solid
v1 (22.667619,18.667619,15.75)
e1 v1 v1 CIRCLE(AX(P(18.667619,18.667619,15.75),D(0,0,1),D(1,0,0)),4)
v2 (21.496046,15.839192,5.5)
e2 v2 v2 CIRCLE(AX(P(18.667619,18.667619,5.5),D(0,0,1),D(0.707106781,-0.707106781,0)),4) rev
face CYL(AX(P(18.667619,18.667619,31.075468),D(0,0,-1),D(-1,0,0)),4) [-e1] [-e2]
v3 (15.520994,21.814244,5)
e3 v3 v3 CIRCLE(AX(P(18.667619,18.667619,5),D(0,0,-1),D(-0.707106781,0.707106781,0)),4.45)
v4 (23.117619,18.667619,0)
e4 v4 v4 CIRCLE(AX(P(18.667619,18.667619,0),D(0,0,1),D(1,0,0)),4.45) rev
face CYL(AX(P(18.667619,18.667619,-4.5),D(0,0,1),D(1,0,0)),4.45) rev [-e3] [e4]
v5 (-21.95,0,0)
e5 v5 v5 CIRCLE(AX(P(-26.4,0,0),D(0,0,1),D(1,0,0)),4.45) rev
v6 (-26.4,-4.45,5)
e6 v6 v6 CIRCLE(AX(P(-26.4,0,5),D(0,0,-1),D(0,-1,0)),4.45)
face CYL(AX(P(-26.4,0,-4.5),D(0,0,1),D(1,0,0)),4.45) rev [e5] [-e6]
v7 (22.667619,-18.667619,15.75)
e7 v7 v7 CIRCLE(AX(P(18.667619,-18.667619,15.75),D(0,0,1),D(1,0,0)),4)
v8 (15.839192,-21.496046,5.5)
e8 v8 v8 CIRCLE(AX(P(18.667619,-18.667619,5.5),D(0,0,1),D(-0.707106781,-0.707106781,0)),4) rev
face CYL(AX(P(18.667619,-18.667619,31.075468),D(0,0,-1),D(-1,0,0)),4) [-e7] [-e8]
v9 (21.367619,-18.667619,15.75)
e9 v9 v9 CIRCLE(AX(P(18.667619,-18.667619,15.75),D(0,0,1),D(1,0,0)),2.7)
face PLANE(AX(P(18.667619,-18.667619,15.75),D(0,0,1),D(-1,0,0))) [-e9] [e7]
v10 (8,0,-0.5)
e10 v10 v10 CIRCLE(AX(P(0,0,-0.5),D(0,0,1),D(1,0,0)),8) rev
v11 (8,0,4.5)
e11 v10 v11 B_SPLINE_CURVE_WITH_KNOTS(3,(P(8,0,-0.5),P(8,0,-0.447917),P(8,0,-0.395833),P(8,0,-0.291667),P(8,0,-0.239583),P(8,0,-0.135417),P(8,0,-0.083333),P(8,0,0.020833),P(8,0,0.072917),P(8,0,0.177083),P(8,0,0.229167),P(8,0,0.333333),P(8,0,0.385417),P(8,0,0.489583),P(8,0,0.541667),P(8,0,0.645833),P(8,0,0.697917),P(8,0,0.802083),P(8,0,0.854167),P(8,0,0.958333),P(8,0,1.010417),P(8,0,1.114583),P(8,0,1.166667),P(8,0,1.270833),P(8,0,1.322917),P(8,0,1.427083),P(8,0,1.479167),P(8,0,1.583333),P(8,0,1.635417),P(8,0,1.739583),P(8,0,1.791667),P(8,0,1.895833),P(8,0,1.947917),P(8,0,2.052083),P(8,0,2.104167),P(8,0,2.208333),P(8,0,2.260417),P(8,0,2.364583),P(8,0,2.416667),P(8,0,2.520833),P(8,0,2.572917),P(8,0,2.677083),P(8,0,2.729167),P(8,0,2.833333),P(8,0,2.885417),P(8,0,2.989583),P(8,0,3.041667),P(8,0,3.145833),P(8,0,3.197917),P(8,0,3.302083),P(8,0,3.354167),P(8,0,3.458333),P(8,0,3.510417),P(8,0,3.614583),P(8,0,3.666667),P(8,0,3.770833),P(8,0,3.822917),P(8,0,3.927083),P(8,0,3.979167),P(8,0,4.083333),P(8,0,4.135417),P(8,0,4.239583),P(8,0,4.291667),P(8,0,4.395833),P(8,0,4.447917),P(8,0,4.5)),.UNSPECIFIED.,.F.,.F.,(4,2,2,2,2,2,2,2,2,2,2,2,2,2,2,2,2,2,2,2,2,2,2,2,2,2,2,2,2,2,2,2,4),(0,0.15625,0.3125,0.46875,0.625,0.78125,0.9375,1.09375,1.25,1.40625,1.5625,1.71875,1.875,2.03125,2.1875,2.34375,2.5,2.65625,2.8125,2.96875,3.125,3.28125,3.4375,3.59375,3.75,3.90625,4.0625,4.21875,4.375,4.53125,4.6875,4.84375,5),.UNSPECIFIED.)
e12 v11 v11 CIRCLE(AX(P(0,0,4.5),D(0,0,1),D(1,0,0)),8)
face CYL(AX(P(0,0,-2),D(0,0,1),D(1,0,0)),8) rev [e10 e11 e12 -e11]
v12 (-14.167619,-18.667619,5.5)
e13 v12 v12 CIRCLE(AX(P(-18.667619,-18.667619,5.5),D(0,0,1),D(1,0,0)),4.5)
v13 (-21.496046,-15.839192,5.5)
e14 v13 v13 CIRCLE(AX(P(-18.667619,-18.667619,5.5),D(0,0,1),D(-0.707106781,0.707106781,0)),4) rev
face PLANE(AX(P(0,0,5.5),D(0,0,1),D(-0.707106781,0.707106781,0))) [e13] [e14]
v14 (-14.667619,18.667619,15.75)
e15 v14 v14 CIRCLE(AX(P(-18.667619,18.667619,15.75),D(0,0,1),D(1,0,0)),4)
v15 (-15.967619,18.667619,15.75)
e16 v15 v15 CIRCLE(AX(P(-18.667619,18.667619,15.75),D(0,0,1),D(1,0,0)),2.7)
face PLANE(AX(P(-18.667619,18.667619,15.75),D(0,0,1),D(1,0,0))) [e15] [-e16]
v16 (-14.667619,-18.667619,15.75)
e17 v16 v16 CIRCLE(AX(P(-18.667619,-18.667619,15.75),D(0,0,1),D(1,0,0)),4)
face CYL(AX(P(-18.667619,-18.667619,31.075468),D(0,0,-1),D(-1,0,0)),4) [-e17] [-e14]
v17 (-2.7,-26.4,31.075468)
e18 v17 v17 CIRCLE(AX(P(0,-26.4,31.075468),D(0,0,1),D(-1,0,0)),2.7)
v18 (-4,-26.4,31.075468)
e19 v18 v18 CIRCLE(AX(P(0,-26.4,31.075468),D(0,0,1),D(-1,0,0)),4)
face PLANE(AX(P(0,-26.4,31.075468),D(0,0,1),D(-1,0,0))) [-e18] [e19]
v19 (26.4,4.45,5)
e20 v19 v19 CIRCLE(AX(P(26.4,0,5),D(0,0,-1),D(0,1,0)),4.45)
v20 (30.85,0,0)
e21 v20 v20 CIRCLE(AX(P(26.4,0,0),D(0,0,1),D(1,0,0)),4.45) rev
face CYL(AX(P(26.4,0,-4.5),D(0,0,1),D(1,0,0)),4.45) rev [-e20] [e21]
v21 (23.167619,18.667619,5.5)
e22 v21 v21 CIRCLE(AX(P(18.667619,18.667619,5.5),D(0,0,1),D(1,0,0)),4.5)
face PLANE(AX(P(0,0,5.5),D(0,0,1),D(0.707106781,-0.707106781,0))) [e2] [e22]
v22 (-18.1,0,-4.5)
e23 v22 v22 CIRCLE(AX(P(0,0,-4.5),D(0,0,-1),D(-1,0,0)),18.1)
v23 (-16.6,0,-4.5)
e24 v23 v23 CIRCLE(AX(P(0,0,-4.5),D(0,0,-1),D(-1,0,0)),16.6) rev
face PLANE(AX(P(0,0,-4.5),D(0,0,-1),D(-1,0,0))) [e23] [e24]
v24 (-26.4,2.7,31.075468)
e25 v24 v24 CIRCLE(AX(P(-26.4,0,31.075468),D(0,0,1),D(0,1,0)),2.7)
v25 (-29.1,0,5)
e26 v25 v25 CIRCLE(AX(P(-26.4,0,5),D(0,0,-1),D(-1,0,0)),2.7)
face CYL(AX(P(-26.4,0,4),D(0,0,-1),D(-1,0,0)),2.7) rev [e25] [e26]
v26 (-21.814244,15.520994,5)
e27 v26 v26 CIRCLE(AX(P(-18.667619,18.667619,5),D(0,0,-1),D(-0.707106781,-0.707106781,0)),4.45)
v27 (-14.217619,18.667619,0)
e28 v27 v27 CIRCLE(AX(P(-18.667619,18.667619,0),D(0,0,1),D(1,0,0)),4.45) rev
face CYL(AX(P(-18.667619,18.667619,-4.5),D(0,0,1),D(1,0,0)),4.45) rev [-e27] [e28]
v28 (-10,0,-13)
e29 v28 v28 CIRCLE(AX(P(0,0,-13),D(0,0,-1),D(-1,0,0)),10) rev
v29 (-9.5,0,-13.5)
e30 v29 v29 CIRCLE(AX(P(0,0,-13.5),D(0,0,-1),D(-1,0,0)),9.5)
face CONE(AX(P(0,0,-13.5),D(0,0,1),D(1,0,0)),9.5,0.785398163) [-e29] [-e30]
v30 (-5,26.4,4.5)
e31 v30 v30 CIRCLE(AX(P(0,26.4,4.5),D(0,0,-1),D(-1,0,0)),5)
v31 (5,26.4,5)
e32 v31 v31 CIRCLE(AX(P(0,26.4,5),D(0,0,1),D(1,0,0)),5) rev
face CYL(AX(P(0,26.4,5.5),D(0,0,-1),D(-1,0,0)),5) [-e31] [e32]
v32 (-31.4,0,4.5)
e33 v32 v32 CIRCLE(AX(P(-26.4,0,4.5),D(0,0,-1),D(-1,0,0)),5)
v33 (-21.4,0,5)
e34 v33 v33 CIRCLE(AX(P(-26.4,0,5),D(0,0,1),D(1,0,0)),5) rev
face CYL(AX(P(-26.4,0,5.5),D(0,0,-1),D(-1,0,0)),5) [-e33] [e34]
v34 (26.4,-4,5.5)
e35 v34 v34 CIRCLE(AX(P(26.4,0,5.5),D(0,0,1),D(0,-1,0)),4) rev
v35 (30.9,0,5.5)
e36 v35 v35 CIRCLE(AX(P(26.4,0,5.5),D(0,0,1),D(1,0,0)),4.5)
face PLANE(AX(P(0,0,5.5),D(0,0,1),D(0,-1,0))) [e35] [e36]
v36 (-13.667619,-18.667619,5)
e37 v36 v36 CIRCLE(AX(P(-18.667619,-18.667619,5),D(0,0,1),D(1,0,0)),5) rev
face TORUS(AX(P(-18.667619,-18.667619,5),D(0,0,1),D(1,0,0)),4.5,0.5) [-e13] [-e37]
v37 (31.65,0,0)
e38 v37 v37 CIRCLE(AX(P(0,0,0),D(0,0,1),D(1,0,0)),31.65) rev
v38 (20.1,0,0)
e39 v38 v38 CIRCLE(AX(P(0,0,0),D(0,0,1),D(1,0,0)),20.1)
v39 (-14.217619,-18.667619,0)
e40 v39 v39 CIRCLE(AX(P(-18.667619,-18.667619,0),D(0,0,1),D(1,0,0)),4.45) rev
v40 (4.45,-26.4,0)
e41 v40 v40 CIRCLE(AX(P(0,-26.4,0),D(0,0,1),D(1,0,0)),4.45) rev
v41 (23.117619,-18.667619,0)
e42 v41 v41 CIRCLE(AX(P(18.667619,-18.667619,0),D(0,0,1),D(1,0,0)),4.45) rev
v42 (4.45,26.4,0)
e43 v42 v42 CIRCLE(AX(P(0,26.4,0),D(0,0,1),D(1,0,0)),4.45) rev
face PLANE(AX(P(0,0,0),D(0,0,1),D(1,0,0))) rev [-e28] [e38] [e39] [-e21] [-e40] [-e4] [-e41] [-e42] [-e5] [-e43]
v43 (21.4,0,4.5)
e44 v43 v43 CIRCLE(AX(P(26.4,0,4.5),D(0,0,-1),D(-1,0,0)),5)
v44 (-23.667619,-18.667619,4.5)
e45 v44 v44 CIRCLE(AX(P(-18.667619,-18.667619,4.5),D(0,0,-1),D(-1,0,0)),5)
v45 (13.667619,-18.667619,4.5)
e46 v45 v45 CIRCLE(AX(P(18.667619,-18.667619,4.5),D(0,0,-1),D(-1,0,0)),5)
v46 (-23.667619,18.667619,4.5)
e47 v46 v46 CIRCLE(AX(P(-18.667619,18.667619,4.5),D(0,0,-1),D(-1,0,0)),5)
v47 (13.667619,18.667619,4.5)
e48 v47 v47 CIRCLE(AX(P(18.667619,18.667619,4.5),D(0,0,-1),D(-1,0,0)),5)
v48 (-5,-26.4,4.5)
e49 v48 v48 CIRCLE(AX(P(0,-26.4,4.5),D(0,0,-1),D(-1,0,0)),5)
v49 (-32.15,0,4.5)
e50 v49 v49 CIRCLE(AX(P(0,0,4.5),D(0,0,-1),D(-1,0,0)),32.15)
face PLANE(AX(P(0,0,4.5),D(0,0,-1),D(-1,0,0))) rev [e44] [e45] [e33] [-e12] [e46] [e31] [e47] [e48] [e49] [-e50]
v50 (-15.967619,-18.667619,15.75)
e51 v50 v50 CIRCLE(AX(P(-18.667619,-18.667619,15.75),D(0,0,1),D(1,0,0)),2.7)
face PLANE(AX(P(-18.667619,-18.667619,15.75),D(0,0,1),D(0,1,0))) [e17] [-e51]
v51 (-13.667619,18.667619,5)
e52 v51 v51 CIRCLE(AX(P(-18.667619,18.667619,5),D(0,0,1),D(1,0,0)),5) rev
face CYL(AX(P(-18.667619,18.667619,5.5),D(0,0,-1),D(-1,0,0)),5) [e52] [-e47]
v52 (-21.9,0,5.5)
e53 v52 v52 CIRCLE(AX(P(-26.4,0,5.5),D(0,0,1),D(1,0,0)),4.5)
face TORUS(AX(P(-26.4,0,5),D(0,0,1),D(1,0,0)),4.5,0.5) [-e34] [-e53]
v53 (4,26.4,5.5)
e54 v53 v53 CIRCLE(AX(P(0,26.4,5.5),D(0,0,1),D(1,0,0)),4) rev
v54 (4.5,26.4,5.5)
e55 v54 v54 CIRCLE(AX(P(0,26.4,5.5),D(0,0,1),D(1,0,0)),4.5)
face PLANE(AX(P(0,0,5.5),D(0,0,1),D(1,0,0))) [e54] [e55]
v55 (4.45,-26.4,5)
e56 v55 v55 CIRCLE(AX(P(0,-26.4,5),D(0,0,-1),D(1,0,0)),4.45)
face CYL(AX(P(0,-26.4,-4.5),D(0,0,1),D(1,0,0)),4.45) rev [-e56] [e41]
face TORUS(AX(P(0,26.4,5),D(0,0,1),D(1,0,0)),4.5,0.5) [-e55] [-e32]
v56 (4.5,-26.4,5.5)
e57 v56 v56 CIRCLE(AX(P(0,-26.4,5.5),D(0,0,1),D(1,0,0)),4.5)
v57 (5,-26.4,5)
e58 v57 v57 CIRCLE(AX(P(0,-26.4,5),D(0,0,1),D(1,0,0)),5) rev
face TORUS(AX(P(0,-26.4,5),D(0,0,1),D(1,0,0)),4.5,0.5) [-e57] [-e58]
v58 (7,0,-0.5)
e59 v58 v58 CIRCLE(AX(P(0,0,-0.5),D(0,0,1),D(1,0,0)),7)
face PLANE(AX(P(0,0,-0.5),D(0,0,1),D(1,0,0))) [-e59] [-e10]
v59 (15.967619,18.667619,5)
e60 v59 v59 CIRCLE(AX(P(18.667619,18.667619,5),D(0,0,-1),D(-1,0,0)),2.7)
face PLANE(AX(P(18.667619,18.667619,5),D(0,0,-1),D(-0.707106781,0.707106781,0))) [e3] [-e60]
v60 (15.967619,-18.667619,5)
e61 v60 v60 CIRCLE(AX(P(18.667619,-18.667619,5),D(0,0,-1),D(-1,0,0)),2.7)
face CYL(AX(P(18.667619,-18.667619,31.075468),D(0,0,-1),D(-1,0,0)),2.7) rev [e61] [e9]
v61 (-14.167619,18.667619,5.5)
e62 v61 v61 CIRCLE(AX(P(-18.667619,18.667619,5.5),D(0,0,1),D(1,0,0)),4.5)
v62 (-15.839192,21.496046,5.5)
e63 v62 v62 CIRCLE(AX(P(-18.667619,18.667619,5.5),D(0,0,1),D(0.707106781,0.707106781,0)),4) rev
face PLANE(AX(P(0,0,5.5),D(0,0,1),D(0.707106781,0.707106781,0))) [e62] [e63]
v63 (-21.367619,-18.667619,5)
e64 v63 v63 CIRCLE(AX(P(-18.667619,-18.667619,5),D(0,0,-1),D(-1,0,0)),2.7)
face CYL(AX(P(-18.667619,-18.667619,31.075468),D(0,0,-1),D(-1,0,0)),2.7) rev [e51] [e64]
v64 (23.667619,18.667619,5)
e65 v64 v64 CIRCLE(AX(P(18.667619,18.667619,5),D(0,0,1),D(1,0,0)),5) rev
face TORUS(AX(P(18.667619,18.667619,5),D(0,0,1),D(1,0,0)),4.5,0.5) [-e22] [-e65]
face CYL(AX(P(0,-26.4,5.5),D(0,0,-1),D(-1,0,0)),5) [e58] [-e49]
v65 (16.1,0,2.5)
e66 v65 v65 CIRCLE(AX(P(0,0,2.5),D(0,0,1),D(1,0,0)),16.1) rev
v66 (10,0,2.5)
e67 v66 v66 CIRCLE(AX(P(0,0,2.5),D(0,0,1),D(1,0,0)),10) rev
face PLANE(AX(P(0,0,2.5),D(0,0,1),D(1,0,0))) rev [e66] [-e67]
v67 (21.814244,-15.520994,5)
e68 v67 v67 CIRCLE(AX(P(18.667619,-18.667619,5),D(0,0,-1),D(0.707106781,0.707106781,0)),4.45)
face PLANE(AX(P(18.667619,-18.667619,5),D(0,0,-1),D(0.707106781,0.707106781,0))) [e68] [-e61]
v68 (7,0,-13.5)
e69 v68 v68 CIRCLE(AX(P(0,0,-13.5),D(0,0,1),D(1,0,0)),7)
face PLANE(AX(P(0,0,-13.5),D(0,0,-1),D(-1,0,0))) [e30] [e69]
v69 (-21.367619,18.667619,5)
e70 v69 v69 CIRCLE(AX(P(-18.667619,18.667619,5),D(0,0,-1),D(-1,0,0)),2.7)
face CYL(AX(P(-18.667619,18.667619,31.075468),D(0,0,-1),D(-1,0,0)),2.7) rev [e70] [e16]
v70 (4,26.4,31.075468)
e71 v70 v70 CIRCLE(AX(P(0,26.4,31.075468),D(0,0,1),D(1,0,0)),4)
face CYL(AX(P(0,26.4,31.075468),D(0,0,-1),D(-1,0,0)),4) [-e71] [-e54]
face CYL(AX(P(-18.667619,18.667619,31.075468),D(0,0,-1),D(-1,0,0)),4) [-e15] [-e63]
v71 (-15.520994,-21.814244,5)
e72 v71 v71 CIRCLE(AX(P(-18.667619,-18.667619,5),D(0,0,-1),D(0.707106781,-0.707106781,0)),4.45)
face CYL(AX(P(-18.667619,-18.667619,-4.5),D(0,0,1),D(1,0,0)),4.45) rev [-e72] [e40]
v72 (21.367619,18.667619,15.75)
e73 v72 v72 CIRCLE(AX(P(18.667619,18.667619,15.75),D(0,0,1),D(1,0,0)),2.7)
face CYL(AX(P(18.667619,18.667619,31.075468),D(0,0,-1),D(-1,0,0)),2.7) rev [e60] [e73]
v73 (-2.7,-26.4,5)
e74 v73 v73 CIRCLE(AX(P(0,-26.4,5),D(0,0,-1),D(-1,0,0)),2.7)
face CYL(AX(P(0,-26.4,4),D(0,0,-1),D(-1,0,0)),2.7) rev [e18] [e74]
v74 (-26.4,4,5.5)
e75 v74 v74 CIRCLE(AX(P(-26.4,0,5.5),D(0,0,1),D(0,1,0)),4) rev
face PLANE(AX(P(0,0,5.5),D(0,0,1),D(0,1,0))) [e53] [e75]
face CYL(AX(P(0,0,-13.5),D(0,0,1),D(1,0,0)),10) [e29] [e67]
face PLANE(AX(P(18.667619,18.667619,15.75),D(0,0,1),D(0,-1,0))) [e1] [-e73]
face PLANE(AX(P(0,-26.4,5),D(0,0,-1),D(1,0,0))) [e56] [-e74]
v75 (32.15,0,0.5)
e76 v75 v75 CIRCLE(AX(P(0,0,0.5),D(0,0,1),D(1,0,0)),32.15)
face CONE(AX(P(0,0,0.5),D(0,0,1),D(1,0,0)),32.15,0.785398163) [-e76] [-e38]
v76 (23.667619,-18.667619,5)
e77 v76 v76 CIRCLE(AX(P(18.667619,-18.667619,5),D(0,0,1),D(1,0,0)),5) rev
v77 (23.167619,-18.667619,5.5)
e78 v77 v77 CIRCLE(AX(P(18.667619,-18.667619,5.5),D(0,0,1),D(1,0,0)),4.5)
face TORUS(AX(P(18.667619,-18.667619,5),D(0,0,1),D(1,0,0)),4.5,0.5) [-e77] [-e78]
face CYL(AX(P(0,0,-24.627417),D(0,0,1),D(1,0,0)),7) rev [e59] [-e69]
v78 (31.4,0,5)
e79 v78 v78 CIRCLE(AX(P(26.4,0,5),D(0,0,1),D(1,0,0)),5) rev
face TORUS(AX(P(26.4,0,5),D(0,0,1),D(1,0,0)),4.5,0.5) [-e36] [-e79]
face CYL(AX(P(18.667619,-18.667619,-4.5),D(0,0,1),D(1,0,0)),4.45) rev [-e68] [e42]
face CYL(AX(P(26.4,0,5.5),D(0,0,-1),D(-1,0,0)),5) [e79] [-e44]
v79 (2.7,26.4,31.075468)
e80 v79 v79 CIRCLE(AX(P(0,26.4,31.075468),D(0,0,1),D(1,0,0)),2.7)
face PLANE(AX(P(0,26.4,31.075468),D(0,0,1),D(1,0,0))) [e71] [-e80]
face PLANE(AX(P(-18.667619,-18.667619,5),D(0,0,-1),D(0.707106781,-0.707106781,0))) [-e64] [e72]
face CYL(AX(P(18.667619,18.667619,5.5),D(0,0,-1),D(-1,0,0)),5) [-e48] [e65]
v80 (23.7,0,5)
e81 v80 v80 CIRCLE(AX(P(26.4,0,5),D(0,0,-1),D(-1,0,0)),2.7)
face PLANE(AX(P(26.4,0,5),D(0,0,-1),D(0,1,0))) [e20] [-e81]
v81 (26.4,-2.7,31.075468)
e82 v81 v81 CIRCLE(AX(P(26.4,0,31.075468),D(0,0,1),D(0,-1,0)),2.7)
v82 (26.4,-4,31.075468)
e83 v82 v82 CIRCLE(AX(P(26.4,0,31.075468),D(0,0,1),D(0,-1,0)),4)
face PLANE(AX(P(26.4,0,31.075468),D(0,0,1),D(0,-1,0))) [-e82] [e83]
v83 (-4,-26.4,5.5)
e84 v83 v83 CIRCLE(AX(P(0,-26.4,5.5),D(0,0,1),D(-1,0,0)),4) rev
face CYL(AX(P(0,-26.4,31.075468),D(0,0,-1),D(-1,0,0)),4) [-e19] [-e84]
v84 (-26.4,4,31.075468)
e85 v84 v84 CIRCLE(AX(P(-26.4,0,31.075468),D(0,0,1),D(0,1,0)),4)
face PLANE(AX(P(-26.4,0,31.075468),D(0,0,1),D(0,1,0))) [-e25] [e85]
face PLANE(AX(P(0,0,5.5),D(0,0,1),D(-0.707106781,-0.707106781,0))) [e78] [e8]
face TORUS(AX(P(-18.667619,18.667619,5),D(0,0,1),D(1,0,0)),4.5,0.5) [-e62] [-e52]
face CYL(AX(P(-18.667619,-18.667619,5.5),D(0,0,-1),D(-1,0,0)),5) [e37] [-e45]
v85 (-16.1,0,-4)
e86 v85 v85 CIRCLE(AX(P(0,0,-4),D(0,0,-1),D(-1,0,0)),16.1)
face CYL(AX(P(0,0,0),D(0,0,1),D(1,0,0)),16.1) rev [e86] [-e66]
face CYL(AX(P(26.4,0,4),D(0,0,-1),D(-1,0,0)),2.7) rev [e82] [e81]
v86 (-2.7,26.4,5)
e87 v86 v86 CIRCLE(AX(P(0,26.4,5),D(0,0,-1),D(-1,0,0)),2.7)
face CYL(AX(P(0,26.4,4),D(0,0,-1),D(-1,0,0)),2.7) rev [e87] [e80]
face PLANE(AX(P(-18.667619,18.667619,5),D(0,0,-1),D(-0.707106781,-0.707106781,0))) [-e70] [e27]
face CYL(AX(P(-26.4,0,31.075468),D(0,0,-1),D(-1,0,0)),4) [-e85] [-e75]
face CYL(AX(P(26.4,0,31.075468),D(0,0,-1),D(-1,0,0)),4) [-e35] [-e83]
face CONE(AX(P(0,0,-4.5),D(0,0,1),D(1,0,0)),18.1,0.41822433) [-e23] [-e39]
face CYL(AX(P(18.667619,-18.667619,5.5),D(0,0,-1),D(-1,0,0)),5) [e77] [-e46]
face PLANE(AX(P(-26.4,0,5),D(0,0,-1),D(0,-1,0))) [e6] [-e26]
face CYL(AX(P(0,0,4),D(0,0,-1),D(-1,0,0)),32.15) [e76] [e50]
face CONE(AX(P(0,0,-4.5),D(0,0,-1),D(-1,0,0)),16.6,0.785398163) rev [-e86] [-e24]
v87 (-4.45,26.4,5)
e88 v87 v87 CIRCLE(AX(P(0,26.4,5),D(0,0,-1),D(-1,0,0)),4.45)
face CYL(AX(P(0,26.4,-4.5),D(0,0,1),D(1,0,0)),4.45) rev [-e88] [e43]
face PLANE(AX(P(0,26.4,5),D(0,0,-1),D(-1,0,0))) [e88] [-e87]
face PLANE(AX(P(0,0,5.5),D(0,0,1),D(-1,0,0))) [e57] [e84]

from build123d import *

# Parameters (mm, degrees)
SKETCH1_R                = 32.15
SKETCH1_R_2              = 2.7
BOSS_EXTRUDE1_DEPTH      = 4
SKETCH2_R                = 4
SKETCH2_R_2              = 2.7
BOSS_EXTRUDE2_DEPTH      = 27.07546845
SKETCH3_R                = 5
SKETCH3_R_2              = 4
BOSS_EXTRUDE3_DEPTH      = 1.5
FILLET2_R                = 0.5
CIRPATTERN1_COUNT        = 8
FILLET2_OF_CIRPATTERN1_R = 0.5
CHAMFER1_SIZE            = 0.5
SKETCH9_R                = 8
CUT_EXTRUDE4_DEPTH       = 53.918106464
BOSS_EXTRUDE7_START      = -6.5
SKETCH10_R               = 8
SKETCH10_R_2             = 6.5
BOSS_EXTRUDE7_DEPTH      = 6.5
CUT_EXTRUDE5_DEPTH       = 53.918106464
CUT_EXTRUDE5_DEPTH_BACK  = 53.918106464
SKETCH14_R               = 16.1
SKETCH15_R               = 16.1
SKETCH15_R_2             = 15.1
BOSS_EXTRUDE8_DEPTH      = 1.5
SKETCH16_R               = 18.1
SKETCH16_R_2             = 16.1
BOSS_EXTRUDE9_DEPTH      = 4.5
CHAMFER3_SIZE2           = 4.5
CHAMFER3_SIZE            = 2
CUT_EXTRUDE3_START       = -5
SKETCH7_R                = 4.45
CUT_EXTRUDE3_DEPTH       = 61.072041358
CIRPATTERN2_COUNT        = 8
CHAMFER4_SIZE            = 0.5
SKETCH17_R               = 6.596186261
CUT_EXTRUDE6_DEPTH       = 15.32546845
CIRPATTERN3_COUNT        = 4
BOSS_EXTRUDE11_START     = -2
SKETCH19_R               = 15.1
BOSS_EXTRUDE11_DEPTH     = 2
SKETCH18_R               = 10
SKETCH18_R_2             = 8
BOSS_EXTRUDE10_DEPTH     = 16
SKETCH20_R               = 8
CUT_EXTRUDE7_DEPTH       = 6.5
BOSS_EXTRUDE12_START     = -5
SKETCH23_R               = 8
SKETCH23_R_2             = 7
BOSS_EXTRUDE12_DEPTH     = 1.5
CHAMFER6_SIZE            = 0.5
CUT_EXTRUDE8_DEPTH       = 57.224830931
CUT_EXTRUDE8_DEPTH_BACK  = 57.224830931
SKETCH24_R               = 7
SKETCH25_R               = 32.15
SKETCH25_R_2             = 5
SKETCH25_R_3             = 15.1
BOSS_EXTRUDE13_DEPTH     = 0.5


with BuildPart() as part:
    # Sketch1 → Boss-Extrude1 (new body)
    with BuildSketch(Plane.XY):
        Circle(SKETCH1_R)
        with Locations((0, 26.4)):
            Circle(SKETCH1_R_2, mode=Mode.SUBTRACT)
        with Locations((26.4, 0)):
            Circle(SKETCH1_R_2, mode=Mode.SUBTRACT)
        with Locations((0, -26.4)):
            Circle(SKETCH1_R_2, mode=Mode.SUBTRACT)
        with Locations((-26.4, 0)):
            Circle(SKETCH1_R_2, mode=Mode.SUBTRACT)
    extrude(amount=BOSS_EXTRUDE1_DEPTH)

    # Sketch2 → Boss-Extrude2 (add)
    with BuildSketch(Plane.XY.offset(4)):
        with Locations((0, 26.4)):
            Circle(SKETCH2_R)
        with Locations((0, 26.4)):
            Circle(SKETCH2_R_2, mode=Mode.SUBTRACT)
    boss_extrude2 = extrude(amount=BOSS_EXTRUDE2_DEPTH)

    # Sketch3 → Boss-Extrude3 (add)
    with BuildSketch(Plane.XY.offset(4)):
        with Locations((0, 26.4)):
            Circle(SKETCH3_R)
        with Locations((0, 26.4)):
            Circle(SKETCH3_R_2, mode=Mode.SUBTRACT)
    boss_extrude3 = extrude(amount=BOSS_EXTRUDE3_DEPTH)

    # Fillet2
    fillet2_edges = [part.edges().sort_by_distance(p)[0] for p in [
        (-5, 26.4, 5.5),
    ]]
    fillet(fillet2_edges, radius=FILLET2_R)

    # CirPattern1: Boss-Extrude2, Boss-Extrude3 ×8 about axis
    cirpattern1_axis = Axis((0, 0, 0), (0, 0, 1))
    add([boss_extrude2.rotate(cirpattern1_axis, i * 360 / CIRPATTERN1_COUNT) for i in range(1, CIRPATTERN1_COUNT)])
    add([boss_extrude3.rotate(cirpattern1_axis, i * 360 / CIRPATTERN1_COUNT) for i in range(1, CIRPATTERN1_COUNT)])

    # Fillet2 of CirPattern1
    fillet2_of_cirpattern1_edges = [part.edges().sort_by_distance(p)[0] for p in [
        (-22.203152929, 15.132085117, 5.5),
        (-26.4, -5, 5.5),
        (-15.132085117, -22.203152929, 5.5),
        (5, -26.4, 5.5),
        (22.203152929, -15.132085117, 5.5),
        (26.4, 5, 5.5),
        (15.132085117, 22.203152929, 5.5),
    ]]
    fillet(fillet2_of_cirpattern1_edges, radius=FILLET2_OF_CIRPATTERN1_R)

    # Chamfer1
    chamfer1_edges = [part.edges().sort_by_distance(p)[0] for p in [
        (-32.15, 0, 0),
    ]]
    chamfer(chamfer1_edges, length=CHAMFER1_SIZE)

    # Sketch9 → Cut-Extrude4 (cut, through all)
    with BuildSketch(Plane.XY.offset(4)):
        Circle(SKETCH9_R)
    extrude(amount=-CUT_EXTRUDE4_DEPTH, mode=Mode.SUBTRACT)

    # Sketch10 → Boss-Extrude7 (add)
    with BuildSketch(Plane(origin=(0, 0, 0), x_dir=(-1, 0, 0), z_dir=(0, 0, -1)).offset(BOSS_EXTRUDE7_START)):
        Circle(SKETCH10_R)
        Circle(SKETCH10_R_2, mode=Mode.SUBTRACT)
    extrude(amount=BOSS_EXTRUDE7_DEPTH)

    # Sketch14 → Cut-Extrude5 (cut, two sides: drawn at the far end of the back side and taken through both)
    with BuildSketch(Plane.XY.offset(4).offset(-CUT_EXTRUDE5_DEPTH_BACK)):
        Circle(SKETCH14_R)
    extrude(amount=CUT_EXTRUDE5_DEPTH + CUT_EXTRUDE5_DEPTH_BACK, mode=Mode.SUBTRACT)

    # Sketch15 → Boss-Extrude8 (add)
    with BuildSketch(Plane.XY.offset(4)):
        Circle(SKETCH15_R)
        Circle(SKETCH15_R_2, mode=Mode.SUBTRACT)
    extrude(amount=-BOSS_EXTRUDE8_DEPTH)

    # Sketch16 → Boss-Extrude9 (add)
    with BuildSketch(Plane(origin=(0, 0, 0), x_dir=(-1, 0, 0), z_dir=(0, 0, -1))):
        with Locations(Location((0, 0, 0), (0, 0, 180))):
            Circle(SKETCH16_R)
        with Locations(Location((0, 0, 0), (0, 0, 180))):
            Circle(SKETCH16_R_2, mode=Mode.SUBTRACT)
    extrude(amount=BOSS_EXTRUDE9_DEPTH)

    # Chamfer3
    chamfer3_edges = [part.edges().sort_by_distance(p)[0] for p in [
        (-18.1, 0, 0),
    ]]
    chamfer3_side = [part.faces().sort_by_distance(p)[0] for p in [
        (-18.14, 0, 0),
    ]]
    chamfer(chamfer3_edges, length=CHAMFER3_SIZE - 0.0001, length2=CHAMFER3_SIZE2 - 0.0001, reference=chamfer3_side[0])  # a hair under: the kernel refuses the full size

    # Sketch7 → Cut-Extrude3 (cut)
    with BuildSketch(Plane(origin=(0, 0, 0), x_dir=(-1, 0, 0), z_dir=(0, 0, -1)).offset(CUT_EXTRUDE3_START)):
        with Locations(Location((0, 26.4, 0), (0, 0, 180))):
            Circle(SKETCH7_R)
    cut_extrude3 = extrude(amount=CUT_EXTRUDE3_DEPTH, mode=Mode.SUBTRACT)

    # CirPattern2: Cut-Extrude3 ×8 about axis
    cirpattern2_axis = Axis((0, 0, 0), (0, 0, 1))
    for i in range(1, CIRPATTERN2_COUNT):
        add(cut_extrude3.rotate(cirpattern2_axis, i * 360 / CIRPATTERN2_COUNT), mode=Mode.SUBTRACT)

    # Chamfer4
    chamfer4_edges = [part.edges().sort_by_distance(p)[0] for p in [
        (-16.1, 0, -4.5),
    ]]
    chamfer(chamfer4_edges, length=CHAMFER4_SIZE)

    # Sketch17 → Cut-Extrude6 (cut)
    with BuildSketch(Plane.XY.offset(31.07546845)):
        with Locations((-18.667619023, 18.667619023)):
            Circle(SKETCH17_R)
    cut_extrude6 = extrude(amount=-CUT_EXTRUDE6_DEPTH, mode=Mode.SUBTRACT)

    # CirPattern3: Cut-Extrude6 ×4 about axis
    cirpattern3_axis = Axis((0, 0, 4), (0, 0, 1))
    for i in range(1, CIRPATTERN3_COUNT):
        add(cut_extrude6.rotate(cirpattern3_axis, i * 360 / CIRPATTERN3_COUNT), mode=Mode.SUBTRACT)

    # Sketch19 → Boss-Extrude11 (add)
    with BuildSketch(Plane(origin=(0, 0, 2.5), x_dir=(-1, 0, 0), z_dir=(0, 0, -1)).offset(BOSS_EXTRUDE11_START)):
        Circle(SKETCH19_R)
    extrude(amount=BOSS_EXTRUDE11_DEPTH)

    # Sketch18 → Boss-Extrude10 (add)
    # profile 1 of 2: a face of its own
    with BuildSketch(Plane(origin=(0, 0, 2.5), x_dir=(-1, 0, 0), z_dir=(0, 0, -1))):
        with Locations(Location((0, 0, 0), (0, 0, 180))):
            Circle(SKETCH18_R)
        Circle(SKETCH18_R_2, mode=Mode.SUBTRACT)
    # profile 2 of 2: a face of its own
    with BuildSketch(Plane(origin=(0, 0, 2.5), x_dir=(-1, 0, 0), z_dir=(0, 0, -1))):
        Circle(SKETCH18_R_2)
    extrude(amount=BOSS_EXTRUDE10_DEPTH)

    # Sketch20 → Cut-Extrude7 (cut)
    with BuildSketch(Plane.XY.offset(4.5)):
        Circle(SKETCH20_R)
    extrude(amount=-CUT_EXTRUDE7_DEPTH, mode=Mode.SUBTRACT)

    # Sketch23 → Boss-Extrude12 (add)
    with BuildSketch(Plane.XY.offset(4.5).offset(BOSS_EXTRUDE12_START)):
        Circle(SKETCH23_R)
        Circle(SKETCH23_R_2, mode=Mode.SUBTRACT)
    extrude(amount=-BOSS_EXTRUDE12_DEPTH)

    # Chamfer6
    chamfer6_edges = [part.edges().sort_by_distance(p)[0] for p in [
        (-10, 0, -13.5),
    ]]
    chamfer(chamfer6_edges, length=CHAMFER6_SIZE)

    # Sketch24 → Cut-Extrude8 (cut, two sides: drawn at the far end of the back side and taken through both)
    with BuildSketch(Plane.XY.offset(-2).offset(-CUT_EXTRUDE8_DEPTH_BACK)):
        Circle(SKETCH24_R)
    extrude(amount=CUT_EXTRUDE8_DEPTH + CUT_EXTRUDE8_DEPTH_BACK, mode=Mode.SUBTRACT)

    # Sketch25 → Boss-Extrude13 (add)
    with BuildSketch(Plane.XY.offset(4)):
        with Locations(Location((0, 0, 0), (0, 0, 180))):
            Circle(SKETCH25_R)
        with Locations(Location((-18.667619023, -18.667619023, 0), (0, 0, 180))):
            Circle(SKETCH25_R_2, mode=Mode.SUBTRACT)
        with Locations(Location((0, -26.4, 0), (0, 0, 180))):
            Circle(SKETCH25_R_2, mode=Mode.SUBTRACT)
        with Locations(Location((18.667619023, -18.667619023, 0), (0, 0, 180))):
            Circle(SKETCH25_R_2, mode=Mode.SUBTRACT)
        with Locations(Location((26.4, 0, 0), (0, 0, 180))):
            Circle(SKETCH25_R_2, mode=Mode.SUBTRACT)
        with Locations(Location((-26.4, 0, 0), (0, 0, 180))):
            Circle(SKETCH25_R_2, mode=Mode.SUBTRACT)
        with Locations(Location((-18.667619023, 18.667619023, 0), (0, 0, 180))):
            Circle(SKETCH25_R_2, mode=Mode.SUBTRACT)
        Circle(SKETCH25_R_3, mode=Mode.SUBTRACT)
        with Locations(Location((0, 26.4, 0), (0, 0, 180))):
            Circle(SKETCH25_R_2, mode=Mode.SUBTRACT)
        with Locations(Location((18.667619023, 18.667619023, 0), (0, 0, 180))):
            Circle(SKETCH25_R_2, mode=Mode.SUBTRACT)
    extrude(amount=BOSS_EXTRUDE13_DEPTH)


solid = part.part
